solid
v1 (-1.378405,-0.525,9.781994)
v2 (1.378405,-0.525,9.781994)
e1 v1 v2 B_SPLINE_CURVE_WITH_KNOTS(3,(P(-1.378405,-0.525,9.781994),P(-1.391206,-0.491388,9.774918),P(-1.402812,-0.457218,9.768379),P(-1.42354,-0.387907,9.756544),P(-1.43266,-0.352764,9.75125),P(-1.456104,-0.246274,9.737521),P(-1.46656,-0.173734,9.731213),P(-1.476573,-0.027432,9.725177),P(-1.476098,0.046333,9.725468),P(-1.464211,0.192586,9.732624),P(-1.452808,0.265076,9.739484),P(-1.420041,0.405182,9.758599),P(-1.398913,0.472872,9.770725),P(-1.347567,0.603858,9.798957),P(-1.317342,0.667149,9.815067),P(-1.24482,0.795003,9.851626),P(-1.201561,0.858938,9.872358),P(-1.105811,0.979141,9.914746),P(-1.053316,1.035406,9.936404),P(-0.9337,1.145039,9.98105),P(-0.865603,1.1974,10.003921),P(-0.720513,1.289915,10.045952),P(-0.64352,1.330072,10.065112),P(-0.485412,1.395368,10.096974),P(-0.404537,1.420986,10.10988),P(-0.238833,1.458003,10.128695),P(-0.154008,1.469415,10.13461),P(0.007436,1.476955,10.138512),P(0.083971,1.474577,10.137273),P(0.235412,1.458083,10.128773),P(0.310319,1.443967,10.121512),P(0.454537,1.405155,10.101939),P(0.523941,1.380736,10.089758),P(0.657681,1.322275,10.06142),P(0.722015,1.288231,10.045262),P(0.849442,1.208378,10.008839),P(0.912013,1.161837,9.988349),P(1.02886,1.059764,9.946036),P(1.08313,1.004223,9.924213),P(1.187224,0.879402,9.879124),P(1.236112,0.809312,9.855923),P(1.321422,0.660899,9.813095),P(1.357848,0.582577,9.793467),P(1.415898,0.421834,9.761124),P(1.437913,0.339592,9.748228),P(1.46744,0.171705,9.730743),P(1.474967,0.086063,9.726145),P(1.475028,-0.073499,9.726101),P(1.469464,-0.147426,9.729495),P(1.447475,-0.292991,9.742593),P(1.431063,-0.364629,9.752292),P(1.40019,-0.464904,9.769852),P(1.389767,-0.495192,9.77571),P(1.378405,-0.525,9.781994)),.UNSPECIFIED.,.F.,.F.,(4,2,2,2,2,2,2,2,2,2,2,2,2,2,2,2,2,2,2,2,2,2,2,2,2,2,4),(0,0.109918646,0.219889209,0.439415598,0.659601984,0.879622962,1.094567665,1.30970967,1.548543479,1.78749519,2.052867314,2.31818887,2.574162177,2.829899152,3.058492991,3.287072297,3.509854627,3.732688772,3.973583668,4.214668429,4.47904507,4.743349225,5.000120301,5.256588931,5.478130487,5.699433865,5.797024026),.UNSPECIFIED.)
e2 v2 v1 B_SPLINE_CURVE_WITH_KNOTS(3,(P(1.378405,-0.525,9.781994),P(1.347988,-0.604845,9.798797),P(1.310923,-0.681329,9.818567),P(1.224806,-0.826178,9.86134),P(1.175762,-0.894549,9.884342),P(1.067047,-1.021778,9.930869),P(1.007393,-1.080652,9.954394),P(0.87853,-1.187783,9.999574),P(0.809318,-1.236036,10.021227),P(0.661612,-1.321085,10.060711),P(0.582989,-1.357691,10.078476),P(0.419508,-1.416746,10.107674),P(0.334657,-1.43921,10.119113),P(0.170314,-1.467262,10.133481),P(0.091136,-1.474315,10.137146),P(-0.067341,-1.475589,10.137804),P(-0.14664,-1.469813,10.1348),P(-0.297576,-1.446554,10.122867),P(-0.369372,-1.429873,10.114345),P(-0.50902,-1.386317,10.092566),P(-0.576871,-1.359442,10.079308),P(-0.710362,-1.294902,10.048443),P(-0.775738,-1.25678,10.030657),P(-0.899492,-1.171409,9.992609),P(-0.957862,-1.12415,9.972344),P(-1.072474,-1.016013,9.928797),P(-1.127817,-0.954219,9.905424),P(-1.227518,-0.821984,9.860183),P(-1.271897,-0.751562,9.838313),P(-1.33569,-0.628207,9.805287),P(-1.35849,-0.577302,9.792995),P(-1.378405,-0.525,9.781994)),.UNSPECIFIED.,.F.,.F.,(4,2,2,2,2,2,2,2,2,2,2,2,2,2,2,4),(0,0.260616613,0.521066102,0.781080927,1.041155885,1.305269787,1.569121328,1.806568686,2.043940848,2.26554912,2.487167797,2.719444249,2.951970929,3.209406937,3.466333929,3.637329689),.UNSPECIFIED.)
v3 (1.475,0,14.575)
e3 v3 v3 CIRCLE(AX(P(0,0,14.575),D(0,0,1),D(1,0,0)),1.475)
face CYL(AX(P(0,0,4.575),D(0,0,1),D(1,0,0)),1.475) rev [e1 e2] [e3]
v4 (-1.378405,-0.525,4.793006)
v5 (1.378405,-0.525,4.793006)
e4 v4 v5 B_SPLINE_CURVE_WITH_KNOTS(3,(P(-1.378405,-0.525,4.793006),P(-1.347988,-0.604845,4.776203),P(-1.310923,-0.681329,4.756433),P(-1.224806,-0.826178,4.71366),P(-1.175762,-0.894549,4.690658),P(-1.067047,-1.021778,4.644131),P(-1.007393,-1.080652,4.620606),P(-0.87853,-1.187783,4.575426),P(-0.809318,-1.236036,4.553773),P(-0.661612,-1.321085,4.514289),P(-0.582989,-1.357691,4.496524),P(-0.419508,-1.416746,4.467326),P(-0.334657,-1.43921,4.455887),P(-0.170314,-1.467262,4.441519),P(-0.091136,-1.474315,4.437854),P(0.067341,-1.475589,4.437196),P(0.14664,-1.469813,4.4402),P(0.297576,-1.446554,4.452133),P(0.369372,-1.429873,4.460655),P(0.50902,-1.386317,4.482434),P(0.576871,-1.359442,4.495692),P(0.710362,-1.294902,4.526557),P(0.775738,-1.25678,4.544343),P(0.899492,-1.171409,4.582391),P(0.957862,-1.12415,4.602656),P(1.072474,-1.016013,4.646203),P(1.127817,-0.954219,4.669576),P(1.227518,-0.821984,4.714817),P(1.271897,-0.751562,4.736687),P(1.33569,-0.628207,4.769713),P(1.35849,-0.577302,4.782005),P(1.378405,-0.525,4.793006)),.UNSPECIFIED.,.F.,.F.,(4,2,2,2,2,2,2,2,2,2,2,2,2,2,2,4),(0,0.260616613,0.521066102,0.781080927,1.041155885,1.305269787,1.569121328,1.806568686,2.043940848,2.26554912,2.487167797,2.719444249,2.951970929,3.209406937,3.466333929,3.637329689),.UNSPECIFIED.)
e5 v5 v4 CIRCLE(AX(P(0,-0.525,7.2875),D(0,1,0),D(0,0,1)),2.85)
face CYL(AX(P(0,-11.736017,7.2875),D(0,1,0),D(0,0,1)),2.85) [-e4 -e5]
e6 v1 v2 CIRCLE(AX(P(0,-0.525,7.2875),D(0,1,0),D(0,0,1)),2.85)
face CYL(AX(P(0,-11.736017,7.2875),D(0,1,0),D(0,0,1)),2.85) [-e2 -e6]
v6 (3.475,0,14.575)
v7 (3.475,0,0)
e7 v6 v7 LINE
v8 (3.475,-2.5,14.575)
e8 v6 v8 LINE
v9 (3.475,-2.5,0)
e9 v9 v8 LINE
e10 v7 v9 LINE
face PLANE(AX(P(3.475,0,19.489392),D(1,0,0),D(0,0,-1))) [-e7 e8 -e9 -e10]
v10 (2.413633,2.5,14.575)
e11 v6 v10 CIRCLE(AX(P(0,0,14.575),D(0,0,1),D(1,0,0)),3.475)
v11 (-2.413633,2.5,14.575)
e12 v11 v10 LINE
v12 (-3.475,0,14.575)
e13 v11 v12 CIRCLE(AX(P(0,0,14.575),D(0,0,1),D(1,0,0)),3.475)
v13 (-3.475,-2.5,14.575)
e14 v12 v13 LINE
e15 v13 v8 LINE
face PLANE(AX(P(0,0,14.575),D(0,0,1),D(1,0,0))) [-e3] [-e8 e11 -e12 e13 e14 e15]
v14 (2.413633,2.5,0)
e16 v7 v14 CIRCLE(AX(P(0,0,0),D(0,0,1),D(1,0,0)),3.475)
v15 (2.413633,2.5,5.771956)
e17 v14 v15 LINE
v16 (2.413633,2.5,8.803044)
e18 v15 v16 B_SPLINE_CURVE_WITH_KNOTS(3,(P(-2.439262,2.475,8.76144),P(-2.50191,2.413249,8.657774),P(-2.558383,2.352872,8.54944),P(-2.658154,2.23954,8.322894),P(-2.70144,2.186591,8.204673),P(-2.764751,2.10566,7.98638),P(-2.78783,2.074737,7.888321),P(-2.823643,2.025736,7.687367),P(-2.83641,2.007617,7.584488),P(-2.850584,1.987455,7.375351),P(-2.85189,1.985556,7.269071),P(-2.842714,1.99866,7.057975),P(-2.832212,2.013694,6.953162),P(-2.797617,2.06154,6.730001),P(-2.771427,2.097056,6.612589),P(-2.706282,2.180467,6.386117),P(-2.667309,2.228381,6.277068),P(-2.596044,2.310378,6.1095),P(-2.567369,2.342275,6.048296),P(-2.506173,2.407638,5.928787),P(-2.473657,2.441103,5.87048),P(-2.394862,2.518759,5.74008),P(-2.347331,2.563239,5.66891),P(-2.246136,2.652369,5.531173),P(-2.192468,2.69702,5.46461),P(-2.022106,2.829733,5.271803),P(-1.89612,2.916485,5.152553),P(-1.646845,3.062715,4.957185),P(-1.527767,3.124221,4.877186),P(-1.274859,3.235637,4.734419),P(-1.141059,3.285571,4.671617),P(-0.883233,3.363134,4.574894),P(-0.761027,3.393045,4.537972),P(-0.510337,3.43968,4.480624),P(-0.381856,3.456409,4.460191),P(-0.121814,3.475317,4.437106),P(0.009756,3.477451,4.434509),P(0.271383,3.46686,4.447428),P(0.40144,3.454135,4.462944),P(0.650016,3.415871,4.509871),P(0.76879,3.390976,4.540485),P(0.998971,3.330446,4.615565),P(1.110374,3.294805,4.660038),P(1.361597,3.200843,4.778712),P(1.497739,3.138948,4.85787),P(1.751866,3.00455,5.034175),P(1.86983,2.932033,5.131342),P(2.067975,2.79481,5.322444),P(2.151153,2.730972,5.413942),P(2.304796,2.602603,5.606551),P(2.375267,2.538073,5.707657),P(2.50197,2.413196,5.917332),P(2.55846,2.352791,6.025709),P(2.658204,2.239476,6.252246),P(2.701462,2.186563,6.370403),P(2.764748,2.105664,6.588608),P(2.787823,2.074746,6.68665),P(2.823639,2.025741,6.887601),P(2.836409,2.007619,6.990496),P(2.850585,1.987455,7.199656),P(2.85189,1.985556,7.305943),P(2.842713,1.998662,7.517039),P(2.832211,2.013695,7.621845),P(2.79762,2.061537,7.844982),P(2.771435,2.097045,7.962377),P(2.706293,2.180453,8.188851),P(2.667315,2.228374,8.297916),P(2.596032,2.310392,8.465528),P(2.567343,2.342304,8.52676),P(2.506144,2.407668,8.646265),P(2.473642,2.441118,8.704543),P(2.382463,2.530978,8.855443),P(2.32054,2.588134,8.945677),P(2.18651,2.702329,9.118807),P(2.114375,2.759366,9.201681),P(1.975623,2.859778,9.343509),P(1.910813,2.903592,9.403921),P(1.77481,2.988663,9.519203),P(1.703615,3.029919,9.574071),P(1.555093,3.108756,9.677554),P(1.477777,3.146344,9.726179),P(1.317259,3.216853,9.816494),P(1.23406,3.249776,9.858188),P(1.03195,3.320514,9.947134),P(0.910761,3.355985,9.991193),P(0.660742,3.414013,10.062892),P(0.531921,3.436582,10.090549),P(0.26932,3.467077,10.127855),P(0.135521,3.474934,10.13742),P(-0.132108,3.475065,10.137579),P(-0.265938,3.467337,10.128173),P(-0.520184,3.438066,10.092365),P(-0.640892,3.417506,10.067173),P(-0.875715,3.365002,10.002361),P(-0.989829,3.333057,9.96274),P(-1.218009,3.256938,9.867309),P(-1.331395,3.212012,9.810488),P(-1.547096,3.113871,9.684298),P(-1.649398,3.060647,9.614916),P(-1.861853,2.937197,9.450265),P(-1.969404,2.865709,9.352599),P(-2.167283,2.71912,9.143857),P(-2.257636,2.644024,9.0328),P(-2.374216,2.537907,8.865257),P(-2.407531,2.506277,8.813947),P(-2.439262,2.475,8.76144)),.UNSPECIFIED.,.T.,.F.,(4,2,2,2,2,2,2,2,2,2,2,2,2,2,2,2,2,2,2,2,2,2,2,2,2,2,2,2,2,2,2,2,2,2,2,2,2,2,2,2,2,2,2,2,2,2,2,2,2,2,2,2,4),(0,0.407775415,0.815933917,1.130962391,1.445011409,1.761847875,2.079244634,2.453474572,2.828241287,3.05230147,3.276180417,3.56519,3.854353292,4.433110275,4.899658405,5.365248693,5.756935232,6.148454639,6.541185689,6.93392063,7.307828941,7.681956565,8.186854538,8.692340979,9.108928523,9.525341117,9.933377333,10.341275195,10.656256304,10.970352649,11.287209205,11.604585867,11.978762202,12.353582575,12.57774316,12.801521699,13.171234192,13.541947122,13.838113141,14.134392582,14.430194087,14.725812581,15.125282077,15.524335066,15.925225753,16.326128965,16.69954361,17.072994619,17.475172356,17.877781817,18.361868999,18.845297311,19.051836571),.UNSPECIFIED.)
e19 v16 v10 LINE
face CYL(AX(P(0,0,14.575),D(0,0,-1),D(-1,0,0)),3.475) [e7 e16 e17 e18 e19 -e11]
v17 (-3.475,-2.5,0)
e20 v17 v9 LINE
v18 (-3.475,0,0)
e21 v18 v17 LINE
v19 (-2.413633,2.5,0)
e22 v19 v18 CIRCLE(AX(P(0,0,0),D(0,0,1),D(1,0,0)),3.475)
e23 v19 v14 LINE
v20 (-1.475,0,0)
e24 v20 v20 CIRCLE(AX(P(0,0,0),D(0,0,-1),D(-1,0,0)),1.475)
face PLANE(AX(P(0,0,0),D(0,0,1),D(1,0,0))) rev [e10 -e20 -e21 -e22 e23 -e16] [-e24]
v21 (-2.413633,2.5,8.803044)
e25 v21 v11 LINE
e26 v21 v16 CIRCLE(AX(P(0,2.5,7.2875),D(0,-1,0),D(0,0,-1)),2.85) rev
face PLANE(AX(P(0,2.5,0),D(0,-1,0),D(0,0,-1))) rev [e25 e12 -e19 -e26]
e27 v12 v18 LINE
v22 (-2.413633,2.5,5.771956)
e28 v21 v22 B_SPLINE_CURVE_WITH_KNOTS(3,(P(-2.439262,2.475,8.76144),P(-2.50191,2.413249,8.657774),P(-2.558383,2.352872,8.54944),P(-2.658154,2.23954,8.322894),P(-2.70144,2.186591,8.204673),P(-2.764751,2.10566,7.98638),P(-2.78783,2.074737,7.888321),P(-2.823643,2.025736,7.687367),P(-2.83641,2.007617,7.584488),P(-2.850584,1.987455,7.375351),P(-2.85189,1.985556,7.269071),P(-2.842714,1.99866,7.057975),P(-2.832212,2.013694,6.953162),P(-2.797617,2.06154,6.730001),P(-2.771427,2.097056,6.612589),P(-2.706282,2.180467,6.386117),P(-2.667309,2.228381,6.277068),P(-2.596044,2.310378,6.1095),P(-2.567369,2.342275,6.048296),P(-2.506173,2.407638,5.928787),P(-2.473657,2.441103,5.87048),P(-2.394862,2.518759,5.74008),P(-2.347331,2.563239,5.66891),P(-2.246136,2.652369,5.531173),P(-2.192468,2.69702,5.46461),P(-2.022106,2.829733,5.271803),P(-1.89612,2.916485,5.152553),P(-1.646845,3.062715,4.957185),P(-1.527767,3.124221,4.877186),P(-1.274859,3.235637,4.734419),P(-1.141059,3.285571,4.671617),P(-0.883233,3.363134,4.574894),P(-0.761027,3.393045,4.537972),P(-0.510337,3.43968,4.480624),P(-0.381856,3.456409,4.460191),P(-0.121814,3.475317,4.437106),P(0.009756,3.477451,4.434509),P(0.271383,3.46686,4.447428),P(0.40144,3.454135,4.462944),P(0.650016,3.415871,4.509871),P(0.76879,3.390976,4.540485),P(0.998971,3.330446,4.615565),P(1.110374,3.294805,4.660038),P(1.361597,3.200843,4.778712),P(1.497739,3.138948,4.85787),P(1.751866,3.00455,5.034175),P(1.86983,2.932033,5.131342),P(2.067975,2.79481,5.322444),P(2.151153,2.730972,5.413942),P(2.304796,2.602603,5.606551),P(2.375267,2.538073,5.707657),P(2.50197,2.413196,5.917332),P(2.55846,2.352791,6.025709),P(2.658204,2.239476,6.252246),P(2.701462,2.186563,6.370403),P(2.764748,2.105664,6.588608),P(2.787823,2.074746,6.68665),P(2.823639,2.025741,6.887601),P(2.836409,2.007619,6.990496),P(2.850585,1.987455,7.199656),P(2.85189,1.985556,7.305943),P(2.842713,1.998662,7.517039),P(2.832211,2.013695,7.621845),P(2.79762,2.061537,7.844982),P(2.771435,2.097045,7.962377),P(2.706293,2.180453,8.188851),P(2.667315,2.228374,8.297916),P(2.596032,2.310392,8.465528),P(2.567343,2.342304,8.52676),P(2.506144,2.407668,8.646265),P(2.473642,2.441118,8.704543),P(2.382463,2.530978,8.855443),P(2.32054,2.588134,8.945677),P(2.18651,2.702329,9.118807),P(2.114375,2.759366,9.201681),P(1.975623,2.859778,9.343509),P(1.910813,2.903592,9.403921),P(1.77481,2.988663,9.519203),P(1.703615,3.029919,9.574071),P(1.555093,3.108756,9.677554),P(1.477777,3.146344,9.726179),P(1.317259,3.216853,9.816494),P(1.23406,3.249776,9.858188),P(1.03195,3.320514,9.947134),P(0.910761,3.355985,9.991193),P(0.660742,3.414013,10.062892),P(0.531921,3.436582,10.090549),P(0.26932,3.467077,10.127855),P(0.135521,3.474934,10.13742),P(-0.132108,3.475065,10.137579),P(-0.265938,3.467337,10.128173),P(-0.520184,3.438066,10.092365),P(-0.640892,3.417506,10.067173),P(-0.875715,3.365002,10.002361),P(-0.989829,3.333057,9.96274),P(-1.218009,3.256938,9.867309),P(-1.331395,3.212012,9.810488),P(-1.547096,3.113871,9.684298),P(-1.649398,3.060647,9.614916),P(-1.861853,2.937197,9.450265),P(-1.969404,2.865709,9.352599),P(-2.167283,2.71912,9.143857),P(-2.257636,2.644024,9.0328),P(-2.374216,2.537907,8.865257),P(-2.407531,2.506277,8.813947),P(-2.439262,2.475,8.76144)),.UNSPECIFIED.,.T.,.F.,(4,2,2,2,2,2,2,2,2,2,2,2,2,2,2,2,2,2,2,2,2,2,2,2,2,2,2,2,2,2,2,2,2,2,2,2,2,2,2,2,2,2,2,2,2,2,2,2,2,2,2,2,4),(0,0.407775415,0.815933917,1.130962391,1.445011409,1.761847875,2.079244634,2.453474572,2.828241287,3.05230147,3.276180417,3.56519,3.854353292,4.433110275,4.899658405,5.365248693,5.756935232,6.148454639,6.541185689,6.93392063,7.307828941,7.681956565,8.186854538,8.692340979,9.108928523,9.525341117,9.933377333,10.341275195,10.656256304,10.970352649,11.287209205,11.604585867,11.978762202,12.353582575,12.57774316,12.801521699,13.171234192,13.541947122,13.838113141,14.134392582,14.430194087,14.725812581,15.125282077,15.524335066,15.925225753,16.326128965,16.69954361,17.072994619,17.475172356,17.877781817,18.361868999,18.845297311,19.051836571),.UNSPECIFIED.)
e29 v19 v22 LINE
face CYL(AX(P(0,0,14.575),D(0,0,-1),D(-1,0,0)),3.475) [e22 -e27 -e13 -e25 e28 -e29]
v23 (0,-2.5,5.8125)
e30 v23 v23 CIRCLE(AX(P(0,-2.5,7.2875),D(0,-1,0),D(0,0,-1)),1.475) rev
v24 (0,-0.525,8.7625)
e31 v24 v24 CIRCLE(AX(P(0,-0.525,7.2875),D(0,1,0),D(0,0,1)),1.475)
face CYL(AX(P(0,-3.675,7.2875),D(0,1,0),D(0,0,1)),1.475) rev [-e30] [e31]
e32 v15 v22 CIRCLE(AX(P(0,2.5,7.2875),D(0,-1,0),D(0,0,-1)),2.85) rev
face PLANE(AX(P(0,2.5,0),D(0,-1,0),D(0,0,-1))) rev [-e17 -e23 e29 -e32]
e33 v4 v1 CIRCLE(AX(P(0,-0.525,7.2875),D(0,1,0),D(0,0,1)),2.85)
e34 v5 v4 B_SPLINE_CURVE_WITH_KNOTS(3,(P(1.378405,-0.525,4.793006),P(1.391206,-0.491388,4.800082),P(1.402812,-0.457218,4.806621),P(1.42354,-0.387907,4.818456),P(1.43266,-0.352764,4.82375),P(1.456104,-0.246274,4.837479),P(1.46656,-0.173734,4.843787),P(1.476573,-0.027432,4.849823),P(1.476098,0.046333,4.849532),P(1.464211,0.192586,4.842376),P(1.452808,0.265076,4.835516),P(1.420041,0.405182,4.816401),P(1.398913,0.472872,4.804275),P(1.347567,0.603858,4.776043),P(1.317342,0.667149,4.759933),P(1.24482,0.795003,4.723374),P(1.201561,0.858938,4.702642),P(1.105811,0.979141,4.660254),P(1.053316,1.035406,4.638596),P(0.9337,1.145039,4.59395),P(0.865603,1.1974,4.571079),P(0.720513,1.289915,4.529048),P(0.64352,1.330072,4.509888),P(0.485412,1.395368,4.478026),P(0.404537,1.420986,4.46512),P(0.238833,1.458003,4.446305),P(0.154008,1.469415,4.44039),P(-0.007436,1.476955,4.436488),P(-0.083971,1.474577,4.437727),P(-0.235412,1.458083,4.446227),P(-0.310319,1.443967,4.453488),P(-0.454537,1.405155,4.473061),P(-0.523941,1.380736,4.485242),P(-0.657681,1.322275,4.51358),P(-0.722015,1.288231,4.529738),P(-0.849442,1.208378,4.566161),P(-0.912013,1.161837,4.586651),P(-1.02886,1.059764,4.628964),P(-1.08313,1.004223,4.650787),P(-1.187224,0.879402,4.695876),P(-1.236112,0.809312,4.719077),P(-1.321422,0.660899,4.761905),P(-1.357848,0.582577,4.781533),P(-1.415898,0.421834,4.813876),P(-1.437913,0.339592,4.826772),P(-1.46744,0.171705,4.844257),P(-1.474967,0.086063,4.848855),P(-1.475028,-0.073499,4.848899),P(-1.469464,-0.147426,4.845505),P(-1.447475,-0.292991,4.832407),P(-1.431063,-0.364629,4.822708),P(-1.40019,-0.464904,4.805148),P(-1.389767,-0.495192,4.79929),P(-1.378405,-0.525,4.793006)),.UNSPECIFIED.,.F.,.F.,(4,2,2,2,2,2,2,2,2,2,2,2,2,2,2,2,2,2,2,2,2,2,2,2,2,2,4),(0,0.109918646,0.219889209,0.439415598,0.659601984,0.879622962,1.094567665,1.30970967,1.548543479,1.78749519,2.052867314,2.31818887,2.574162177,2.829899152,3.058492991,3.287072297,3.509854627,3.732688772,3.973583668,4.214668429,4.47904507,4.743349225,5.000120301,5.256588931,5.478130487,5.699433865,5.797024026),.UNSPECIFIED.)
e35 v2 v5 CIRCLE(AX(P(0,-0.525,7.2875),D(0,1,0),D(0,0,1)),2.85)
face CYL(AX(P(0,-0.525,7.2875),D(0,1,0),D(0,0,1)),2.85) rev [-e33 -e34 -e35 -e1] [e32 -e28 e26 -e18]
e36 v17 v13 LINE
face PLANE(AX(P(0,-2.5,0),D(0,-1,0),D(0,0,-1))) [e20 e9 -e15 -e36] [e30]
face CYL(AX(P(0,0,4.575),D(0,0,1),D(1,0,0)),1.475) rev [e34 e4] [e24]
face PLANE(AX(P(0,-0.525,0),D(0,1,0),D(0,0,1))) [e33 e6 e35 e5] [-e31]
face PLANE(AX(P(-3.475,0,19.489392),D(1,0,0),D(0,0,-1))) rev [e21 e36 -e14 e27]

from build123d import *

# Parameters (mm, degrees)
SKETCH2_R             = 3.475
BOSS_EXTRUDE2_DEPTH   = 14.575
SKETCH3_R             = 1.475
CUT_EXTRUDE1_DEPTH    = 10
CUT_EXTRUDE2_START    = -10
SKETCH4_R             = 1.475
CUT_EXTRUDE2_DEPTH    = 10
BOSS_EXTRUDE3_DEPTH   = 14.575
SKETCH6_W             = 6.95
SKETCH6_H             = 14.575
BOSS_EXTRUDE4_DEPTH   = 0.2
SKETCH8_W             = 6
SKETCH8_H             = 2
CUT_EXTRUDE3_DEPTH    = 17.560155
SKETCH10_R            = 2.85
CUT_EXTRUDE4_DEPTH    = 3
SKETCH11_R            = 1.675
CUT_EXTRUDE5_DEPTH    = 16.508264
SKETCH17_R            = 2.85
BOSS_EXTRUDE8_DEPTH   = 3.15
BOSS_EXTRUDE9_DEPTH   = 0.150002
BOSS_EXTRUDE9_START   = 4.437502
BOSS_EXTRUDE9_2_DEPTH = 1.376058
BOSS_EXTRUDE9_START_2 = 2.475
BOSS_EXTRUDE9_3_DEPTH = 1.525
BOSS_EXTRUDE12_START  = 4
BOSS_EXTRUDE12_DEPTH  = 4
CUT_EXTRUDE6_DEPTH    = 17.322741
SKETCH23_R            = 1.475
CUT_EXTRUDE8_DEPTH    = 16.508264
SKETCH24_W            = 6.95
SKETCH24_H            = 1.175
CUT_EXTRUDE9_DEPTH    = 16.427634


with BuildPart() as part:
    # Sketch2 → Boss-Extrude2 (new body)
    with BuildSketch(Plane.XY):
        Circle(SKETCH2_R)
    extrude(amount=BOSS_EXTRUDE2_DEPTH)

    # Sketch3 → Cut-Extrude1 (cut)
    with BuildSketch(Plane.XY.offset(14.575)):
        Circle(SKETCH3_R)
    extrude(amount=-CUT_EXTRUDE1_DEPTH, mode=Mode.SUBTRACT)

    # Sketch4 → Cut-Extrude2 (cut)
    with BuildSketch(Plane(origin=(0, 0, 0), x_dir=(-1, 0, 0), z_dir=(0, 0, -1)).offset(CUT_EXTRUDE2_START)):
        with Locations(Location((0, 0, 0), (0, 0, 180))):
            Circle(SKETCH4_R)
    extrude(amount=CUT_EXTRUDE2_DEPTH, mode=Mode.SUBTRACT)

    # Sketch5 → Boss-Extrude3 (add)
    with BuildSketch(Plane(origin=(0, 0, 0), x_dir=(-1, 0, 0), z_dir=(0, 0, -1))):
        with BuildLine():
            ThreePointArc((0, -3.475), (-2.457196, -2.457196), (-3.475, 0))
            Line((-3.475, 0), (-3.475, -3.475))
            Line((-3.475, -3.475), (0, -3.475))
        make_face()
        with BuildLine():
            Line((3.475, -3.475), (3.475, 0))
            ThreePointArc((3.475, 0), (2.457196, -2.457196), (0, -3.475))
            Line((0, -3.475), (3.475, -3.475))
        make_face()
    extrude(amount=-BOSS_EXTRUDE3_DEPTH)

    # Sketch6 → Boss-Extrude4 (add)
    with BuildSketch(Plane.XZ.offset(3.475)):
        with Locations((0, 7.2875)):
            Rectangle(SKETCH6_W, SKETCH6_H)
    extrude(amount=BOSS_EXTRUDE4_DEPTH)

    # Sketch8 → Cut-Extrude3 (cut, through all)
    with BuildSketch(Plane.ZY.offset(3.475)):
        with Locations((7.2875, 3.475)):
            Rectangle(SKETCH8_W, SKETCH8_H)
    extrude(amount=-CUT_EXTRUDE3_DEPTH, mode=Mode.SUBTRACT)

    # Sketch10 → Cut-Extrude4 (cut)
    with BuildSketch(Plane(origin=(0, 2.475, 0), x_dir=(1, 0, 0), z_dir=(0, 1, 0))):
        with Locations(Location((0, -7.2875, 0), (0, 0, 298.924116))):
            Circle(SKETCH10_R)
    extrude(amount=-CUT_EXTRUDE4_DEPTH, mode=Mode.SUBTRACT)

    # Sketch11 → Cut-Extrude5 (cut, through all)
    with BuildSketch(Plane(origin=(0, -0.525, 0), x_dir=(1, 0, 0), z_dir=(0, 1, 0))):
        with Locations(Location((0, -7.2875, 0), (0, 0, 270))):
            Circle(SKETCH11_R)
    extrude(amount=-CUT_EXTRUDE5_DEPTH, mode=Mode.SUBTRACT)

    # Sketch17 → Boss-Extrude8 (add)
    with BuildSketch(Plane(origin=(0, -0.525, 0), x_dir=(1, 0, 0), z_dir=(0, 1, 0))):
        with Locations(Location((0, -7.2875, 0), (0, 0, 298.924116))):
            Circle(SKETCH17_R)
    extrude(amount=-BOSS_EXTRUDE8_DEPTH)

    # Boss-Extrude9: read off the stored shape, not the designer's step
    # Boss-Extrude9 outline → Boss-Extrude9 (add)
    with BuildSketch(Plane.XY.offset(4.2875)):
        with BuildLine():
            ThreePointArc((2.439262, 2.475), (0, 3.475), (-2.439262, 2.475))
            Line((-2.439262, 2.475), (2.439262, 2.475))
        make_face()
    extrude(amount=BOSS_EXTRUDE9_DEPTH)

    # Boss-Extrude9 2 outline → Boss-Extrude9 2 (add)
    with BuildSketch(Plane.XY.offset(BOSS_EXTRUDE9_START)):
        with BuildLine():
            ThreePointArc((2.439262, 2.475), (0, 3.475), (-2.439262, 2.475))
            Line((-2.439262, 2.475), (2.439262, 2.475))
        make_face()
    extrude(amount=BOSS_EXTRUDE9_2_DEPTH)

    # Boss-Extrude9 3 outline → Boss-Extrude9 3 (cut)
    with BuildSketch(Plane(origin=(0, 0, 0), x_dir=(1, 0, 0), z_dir=(0, 1, 0)).offset(BOSS_EXTRUDE9_START_2)):
        with BuildLine():
            ThreePointArc((-0.003518, -4.437502), (-1.401848, -4.806105), (-2.439262, -5.81356))
            Line((-2.439262, -5.81356), (2.439262, -5.81356))
            ThreePointArc((2.439262, -5.81356), (1.401848, -4.806105), (0.003518, -4.437502))
            Line((0.003518, -4.437502), (-0.003518, -4.437502))
        make_face()
    extrude(amount=BOSS_EXTRUDE9_3_DEPTH, mode=Mode.SUBTRACT)

    # Sketch20 → Boss-Extrude12 (add)
    with BuildSketch(Plane(origin=(0, 2.475, 0), x_dir=(1, 0, 0), z_dir=(0, 1, 0)).offset(BOSS_EXTRUDE12_START)):
        with BuildLine():
            Line((-2.439262, -10.2875), (2.439262, -10.2875))
            Line((2.439262, -10.2875), (2.439262, -8.76144))
            ThreePointArc((2.439262, -8.76144), (0, -10.1375), (-2.439262, -8.76144))
            Line((-2.439262, -8.76144), (-2.439262, -10.2875))
        make_face()
    extrude(amount=-BOSS_EXTRUDE12_DEPTH)

    # Sketch21 → Cut-Extrude6 (cut, through all)
    with BuildSketch(Plane.XY.offset(14.575)):
        with BuildLine():
            Line((-2.995994, 6.810074), (-2.799337, 2.058965))
            ThreePointArc((-2.799337, 2.058965), (-0.143714, 3.472027), (2.619604, 2.283265))
            Line((2.619604, 2.283265), (3.825654, 6.913781))
            Line((3.825654, 6.913781), (-2.995994, 6.810074))
        make_face()
    extrude(amount=-CUT_EXTRUDE6_DEPTH, mode=Mode.SUBTRACT)

    # Sketch23 → Cut-Extrude8 (cut, through all)
    with BuildSketch(Plane(origin=(0, -0.525, 0), x_dir=(1, 0, 0), z_dir=(0, 1, 0))):
        with Locations(Location((0, -7.2875, 0), (0, 0, 270))):
            Circle(SKETCH23_R)
    extrude(amount=-CUT_EXTRUDE8_DEPTH, mode=Mode.SUBTRACT)

    # Sketch24 → Cut-Extrude9 (cut, through all)
    with BuildSketch(Plane.XY.offset(14.575)):
        with BuildLine():
            ThreePointArc((2.413633, 2.5), (0, 3.475), (-2.413633, 2.5))
            Line((-2.413633, 2.5), (2.413633, 2.5))
        make_face()
        with Locations((0, -3.0875)):
            Rectangle(SKETCH24_W, SKETCH24_H)
    extrude(amount=-CUT_EXTRUDE9_DEPTH, mode=Mode.SUBTRACT)


solid = part.part
